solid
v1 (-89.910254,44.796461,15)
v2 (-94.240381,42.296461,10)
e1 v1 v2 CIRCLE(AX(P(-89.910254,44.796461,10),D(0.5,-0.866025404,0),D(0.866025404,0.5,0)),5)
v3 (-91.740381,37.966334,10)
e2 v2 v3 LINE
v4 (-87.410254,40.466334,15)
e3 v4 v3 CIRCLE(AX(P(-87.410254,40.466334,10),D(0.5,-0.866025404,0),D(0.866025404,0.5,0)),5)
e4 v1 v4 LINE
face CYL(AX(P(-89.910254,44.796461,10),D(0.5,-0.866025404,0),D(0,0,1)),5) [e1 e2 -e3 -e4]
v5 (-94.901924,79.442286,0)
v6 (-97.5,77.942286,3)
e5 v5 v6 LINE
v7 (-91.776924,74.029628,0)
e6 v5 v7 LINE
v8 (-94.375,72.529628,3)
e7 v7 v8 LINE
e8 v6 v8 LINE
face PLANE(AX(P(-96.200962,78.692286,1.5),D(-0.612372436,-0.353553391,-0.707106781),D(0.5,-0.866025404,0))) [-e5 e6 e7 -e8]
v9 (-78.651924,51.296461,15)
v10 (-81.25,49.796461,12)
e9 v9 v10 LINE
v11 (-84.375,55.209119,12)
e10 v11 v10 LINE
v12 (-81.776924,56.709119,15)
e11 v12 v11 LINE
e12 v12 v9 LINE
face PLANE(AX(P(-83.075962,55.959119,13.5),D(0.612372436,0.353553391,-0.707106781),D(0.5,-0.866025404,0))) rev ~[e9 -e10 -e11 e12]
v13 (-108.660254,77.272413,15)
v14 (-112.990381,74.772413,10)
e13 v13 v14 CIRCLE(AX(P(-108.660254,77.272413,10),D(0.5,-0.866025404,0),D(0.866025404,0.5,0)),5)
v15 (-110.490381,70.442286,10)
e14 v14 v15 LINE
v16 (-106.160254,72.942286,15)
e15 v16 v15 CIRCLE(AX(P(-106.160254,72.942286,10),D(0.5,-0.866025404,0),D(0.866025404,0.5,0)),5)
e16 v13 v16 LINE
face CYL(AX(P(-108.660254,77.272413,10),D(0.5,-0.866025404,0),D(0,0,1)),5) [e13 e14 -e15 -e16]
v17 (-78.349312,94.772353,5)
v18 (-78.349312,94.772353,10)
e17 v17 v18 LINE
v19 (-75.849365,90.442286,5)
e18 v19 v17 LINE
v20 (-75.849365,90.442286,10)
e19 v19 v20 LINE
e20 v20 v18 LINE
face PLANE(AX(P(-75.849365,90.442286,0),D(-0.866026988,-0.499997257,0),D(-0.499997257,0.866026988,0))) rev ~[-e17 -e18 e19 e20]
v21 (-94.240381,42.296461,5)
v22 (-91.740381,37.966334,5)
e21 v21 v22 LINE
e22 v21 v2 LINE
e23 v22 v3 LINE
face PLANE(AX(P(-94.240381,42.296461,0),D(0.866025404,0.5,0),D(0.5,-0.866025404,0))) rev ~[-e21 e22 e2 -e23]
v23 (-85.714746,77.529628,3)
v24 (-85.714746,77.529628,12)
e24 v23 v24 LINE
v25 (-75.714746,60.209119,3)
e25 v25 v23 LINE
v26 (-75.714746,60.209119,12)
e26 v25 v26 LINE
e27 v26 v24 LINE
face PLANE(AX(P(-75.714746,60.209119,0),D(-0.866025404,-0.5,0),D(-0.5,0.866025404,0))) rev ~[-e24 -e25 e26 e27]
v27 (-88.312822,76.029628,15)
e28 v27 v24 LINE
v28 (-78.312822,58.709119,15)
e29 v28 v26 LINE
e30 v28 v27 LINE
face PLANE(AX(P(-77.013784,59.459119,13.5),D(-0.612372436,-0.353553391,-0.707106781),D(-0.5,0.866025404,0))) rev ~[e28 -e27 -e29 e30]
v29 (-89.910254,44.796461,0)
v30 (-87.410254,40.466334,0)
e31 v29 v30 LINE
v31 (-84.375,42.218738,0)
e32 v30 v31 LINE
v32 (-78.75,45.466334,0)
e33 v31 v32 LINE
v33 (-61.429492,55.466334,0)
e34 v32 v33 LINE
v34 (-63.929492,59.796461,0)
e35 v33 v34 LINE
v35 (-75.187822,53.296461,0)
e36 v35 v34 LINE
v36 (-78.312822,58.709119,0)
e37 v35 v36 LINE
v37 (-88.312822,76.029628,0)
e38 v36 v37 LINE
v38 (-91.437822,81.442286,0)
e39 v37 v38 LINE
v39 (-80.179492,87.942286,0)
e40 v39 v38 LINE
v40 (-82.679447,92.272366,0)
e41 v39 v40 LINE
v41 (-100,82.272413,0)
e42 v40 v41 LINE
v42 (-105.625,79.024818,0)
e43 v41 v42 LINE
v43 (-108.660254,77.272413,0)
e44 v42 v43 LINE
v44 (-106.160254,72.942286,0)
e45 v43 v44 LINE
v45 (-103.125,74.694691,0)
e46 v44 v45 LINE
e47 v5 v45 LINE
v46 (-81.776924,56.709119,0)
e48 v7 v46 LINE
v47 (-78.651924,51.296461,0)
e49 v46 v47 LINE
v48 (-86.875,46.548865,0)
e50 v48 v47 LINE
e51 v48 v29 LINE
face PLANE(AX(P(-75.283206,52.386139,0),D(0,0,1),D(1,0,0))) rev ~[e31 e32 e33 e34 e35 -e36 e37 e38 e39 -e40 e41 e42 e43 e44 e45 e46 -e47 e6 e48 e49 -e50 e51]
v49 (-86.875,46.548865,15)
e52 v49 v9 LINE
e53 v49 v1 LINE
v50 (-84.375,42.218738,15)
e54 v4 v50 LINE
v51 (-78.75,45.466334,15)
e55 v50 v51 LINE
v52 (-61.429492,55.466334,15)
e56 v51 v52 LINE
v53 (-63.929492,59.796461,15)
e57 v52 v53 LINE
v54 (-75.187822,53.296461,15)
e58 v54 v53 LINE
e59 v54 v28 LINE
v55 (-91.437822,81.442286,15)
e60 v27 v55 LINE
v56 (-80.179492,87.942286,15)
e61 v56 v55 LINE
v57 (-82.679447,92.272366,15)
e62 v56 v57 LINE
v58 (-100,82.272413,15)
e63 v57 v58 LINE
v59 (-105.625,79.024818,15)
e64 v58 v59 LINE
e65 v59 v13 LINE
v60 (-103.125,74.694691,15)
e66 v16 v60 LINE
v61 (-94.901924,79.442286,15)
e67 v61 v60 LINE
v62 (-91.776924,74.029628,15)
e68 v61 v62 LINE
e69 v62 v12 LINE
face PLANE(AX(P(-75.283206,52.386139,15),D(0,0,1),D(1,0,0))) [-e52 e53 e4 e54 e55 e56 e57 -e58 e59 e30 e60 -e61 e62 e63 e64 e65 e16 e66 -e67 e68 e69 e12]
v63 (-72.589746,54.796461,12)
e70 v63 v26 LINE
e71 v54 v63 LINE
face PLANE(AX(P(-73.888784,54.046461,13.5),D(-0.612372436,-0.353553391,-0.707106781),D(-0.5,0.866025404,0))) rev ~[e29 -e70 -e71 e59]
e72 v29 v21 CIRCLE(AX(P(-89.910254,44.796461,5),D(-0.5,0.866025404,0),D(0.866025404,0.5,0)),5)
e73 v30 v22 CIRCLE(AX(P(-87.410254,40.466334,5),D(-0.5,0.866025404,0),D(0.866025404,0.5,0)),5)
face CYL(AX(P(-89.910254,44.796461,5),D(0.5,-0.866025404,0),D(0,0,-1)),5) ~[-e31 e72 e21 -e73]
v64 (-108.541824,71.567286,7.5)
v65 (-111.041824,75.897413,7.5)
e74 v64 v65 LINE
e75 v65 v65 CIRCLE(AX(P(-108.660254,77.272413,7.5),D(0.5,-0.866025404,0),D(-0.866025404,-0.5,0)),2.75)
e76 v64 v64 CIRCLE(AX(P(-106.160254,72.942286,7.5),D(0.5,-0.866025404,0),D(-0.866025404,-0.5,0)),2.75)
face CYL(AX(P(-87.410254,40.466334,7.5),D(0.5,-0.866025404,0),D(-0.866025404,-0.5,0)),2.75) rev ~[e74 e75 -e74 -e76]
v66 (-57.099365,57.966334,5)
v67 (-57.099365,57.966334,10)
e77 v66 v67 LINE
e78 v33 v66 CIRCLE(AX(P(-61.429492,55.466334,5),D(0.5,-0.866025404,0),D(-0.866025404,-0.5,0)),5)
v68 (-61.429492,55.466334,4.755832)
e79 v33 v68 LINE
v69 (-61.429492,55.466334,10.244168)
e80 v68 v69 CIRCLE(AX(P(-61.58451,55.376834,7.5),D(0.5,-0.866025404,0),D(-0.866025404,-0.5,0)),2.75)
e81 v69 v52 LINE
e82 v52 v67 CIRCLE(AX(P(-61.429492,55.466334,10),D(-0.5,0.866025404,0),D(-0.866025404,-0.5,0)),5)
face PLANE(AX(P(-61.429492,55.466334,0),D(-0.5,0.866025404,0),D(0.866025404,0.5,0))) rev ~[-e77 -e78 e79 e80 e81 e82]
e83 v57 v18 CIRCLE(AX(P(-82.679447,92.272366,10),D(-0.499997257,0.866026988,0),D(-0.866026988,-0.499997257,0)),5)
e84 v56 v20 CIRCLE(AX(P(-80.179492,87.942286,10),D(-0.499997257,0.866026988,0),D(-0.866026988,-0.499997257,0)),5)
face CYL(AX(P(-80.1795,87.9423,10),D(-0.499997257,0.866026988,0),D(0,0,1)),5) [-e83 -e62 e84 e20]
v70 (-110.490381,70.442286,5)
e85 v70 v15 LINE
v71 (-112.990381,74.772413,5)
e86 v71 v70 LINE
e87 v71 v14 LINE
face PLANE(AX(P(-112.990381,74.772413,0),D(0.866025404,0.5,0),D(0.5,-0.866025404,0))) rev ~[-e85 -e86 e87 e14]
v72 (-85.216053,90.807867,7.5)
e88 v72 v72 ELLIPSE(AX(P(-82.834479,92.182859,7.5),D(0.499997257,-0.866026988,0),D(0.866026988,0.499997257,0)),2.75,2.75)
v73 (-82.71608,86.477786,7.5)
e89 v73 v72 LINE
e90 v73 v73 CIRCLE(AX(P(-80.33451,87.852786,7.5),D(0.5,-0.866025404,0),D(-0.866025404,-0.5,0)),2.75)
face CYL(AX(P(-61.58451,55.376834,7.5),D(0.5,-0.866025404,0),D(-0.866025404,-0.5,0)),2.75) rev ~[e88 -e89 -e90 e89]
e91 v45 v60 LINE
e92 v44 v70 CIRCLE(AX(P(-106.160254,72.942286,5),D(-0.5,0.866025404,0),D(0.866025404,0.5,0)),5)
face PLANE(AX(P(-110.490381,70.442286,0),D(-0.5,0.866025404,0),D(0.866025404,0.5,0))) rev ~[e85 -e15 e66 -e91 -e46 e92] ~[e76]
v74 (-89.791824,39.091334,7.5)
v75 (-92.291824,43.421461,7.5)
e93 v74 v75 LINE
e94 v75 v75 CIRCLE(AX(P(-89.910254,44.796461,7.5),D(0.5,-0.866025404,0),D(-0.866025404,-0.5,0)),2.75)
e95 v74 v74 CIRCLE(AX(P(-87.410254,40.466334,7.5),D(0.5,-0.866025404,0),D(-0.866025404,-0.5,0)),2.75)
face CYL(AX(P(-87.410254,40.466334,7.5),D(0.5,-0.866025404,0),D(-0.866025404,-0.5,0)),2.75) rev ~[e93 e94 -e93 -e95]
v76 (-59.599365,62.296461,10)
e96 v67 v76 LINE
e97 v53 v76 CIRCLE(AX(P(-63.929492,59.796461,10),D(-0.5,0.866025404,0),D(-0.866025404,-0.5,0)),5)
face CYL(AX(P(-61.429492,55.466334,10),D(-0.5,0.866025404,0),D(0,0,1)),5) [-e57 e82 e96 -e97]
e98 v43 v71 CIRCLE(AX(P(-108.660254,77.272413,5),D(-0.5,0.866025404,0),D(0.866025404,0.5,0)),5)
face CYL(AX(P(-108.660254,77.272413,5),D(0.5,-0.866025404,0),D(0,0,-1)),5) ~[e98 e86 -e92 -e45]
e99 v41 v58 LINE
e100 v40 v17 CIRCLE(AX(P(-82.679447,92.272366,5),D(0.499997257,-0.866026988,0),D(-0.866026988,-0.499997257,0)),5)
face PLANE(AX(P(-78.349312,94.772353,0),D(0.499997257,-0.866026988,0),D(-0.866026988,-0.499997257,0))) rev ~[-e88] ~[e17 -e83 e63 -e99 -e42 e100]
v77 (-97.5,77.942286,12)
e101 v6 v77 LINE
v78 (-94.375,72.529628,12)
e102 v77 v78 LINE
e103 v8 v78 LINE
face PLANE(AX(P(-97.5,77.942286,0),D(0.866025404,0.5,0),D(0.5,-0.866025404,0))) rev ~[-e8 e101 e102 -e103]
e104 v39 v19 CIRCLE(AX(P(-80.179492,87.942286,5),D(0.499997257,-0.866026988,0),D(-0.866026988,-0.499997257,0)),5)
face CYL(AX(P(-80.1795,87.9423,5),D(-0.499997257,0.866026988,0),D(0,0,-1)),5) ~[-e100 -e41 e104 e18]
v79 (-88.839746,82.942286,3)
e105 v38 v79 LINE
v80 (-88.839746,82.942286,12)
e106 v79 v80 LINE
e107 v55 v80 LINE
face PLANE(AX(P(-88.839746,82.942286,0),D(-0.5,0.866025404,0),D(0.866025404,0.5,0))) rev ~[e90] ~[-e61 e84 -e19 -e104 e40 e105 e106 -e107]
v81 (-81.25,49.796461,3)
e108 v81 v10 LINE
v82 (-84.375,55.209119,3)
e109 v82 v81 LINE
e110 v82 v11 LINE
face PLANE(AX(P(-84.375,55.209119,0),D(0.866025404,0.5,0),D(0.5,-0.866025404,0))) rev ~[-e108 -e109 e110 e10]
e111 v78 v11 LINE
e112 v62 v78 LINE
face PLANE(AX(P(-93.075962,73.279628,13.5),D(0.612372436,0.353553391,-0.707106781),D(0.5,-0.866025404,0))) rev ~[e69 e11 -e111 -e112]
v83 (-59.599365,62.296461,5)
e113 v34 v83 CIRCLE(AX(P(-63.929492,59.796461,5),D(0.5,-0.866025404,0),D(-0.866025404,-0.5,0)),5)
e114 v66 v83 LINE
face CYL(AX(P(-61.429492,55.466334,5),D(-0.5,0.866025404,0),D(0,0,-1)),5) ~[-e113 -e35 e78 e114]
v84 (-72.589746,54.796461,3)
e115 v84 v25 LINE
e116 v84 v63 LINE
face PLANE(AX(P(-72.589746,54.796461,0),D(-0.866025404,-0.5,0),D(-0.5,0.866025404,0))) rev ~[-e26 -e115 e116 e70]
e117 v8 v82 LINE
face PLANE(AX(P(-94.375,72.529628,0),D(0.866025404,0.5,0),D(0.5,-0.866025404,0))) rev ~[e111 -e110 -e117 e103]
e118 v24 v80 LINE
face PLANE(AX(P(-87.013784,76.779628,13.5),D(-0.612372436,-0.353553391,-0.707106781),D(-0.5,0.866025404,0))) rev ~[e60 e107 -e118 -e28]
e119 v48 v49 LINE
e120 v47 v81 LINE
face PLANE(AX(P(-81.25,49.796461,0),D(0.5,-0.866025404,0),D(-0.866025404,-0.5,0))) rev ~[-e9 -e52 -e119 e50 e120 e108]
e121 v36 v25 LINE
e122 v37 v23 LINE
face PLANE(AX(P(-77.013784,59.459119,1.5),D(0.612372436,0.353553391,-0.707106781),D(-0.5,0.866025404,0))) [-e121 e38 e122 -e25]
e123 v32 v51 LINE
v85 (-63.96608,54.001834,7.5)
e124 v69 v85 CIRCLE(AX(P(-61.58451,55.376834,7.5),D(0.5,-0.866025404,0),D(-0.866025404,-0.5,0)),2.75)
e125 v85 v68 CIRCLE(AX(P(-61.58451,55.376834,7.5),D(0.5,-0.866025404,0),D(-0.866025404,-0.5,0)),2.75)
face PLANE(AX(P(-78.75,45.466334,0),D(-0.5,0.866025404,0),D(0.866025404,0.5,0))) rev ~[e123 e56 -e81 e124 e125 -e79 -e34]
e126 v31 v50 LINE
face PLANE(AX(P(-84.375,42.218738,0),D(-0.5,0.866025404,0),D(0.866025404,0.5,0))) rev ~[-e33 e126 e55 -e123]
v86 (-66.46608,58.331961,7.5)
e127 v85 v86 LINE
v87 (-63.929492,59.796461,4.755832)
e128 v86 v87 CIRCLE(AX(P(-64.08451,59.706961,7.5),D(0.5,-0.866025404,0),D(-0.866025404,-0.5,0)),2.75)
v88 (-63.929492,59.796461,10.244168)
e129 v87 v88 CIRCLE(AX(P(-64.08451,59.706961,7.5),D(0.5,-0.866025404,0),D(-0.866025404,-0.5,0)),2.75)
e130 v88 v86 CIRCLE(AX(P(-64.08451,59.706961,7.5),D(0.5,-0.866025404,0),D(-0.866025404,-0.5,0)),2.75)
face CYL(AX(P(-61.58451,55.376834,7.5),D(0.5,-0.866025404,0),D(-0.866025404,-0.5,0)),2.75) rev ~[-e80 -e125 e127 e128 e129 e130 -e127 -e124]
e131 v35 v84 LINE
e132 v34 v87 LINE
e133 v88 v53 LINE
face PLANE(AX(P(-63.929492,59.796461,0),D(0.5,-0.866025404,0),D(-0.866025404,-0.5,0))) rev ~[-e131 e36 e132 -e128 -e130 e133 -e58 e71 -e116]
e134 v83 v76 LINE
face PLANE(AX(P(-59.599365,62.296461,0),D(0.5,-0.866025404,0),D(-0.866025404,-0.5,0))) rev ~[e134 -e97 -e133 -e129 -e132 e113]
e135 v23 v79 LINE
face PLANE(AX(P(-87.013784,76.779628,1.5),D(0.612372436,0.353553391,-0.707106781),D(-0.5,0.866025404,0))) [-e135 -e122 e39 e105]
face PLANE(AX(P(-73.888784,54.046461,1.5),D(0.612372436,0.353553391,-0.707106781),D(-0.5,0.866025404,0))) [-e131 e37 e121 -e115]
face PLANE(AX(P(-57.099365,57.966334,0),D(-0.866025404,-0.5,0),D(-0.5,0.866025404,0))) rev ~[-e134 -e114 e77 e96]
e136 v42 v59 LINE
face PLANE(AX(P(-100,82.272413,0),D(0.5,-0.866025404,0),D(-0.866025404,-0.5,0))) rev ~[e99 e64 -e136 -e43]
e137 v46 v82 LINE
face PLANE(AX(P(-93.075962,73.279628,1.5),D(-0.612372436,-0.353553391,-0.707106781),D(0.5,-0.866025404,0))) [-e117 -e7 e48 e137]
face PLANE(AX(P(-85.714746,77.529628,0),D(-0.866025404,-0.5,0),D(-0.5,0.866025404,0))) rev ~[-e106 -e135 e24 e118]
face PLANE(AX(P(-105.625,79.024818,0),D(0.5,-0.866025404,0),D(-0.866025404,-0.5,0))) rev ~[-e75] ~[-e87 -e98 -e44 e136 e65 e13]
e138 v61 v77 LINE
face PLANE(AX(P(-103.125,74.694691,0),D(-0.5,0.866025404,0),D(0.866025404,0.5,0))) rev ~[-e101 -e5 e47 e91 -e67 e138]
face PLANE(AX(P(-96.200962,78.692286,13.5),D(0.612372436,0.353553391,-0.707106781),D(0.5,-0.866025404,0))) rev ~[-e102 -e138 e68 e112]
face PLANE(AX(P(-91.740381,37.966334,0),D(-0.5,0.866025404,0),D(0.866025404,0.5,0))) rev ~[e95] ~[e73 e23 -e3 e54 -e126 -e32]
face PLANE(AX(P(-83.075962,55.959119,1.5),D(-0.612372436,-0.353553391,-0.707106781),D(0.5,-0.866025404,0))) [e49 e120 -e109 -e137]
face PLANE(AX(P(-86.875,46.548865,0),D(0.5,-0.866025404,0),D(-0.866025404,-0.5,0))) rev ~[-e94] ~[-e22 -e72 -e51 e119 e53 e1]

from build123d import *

# Parameters (mm, degrees)
F1_DEPTH = 15
F3_DEPTH = 60
F4_SIZE  = 3
F5_R     = 5


with BuildPart() as f1:
    # F0 (on Top) → F1 (new body)
    with BuildSketch(Plane.XY):
        Polygon((-84.375, 42.2187384345), (-78.75, 45.4663336987), (-61.4294919243, 55.4663336987), (-63.9294919243, 59.7964607176), (-72.5897459622, 54.7964607176), (-75.7147459622, 60.2091194913), (-84.375, 55.2091194913), (-81.25, 49.7964607176), (-86.875, 46.5488654534), align=None)
        Polygon((-61.4294919243, 55.4663336987), (-57.0993649054, 57.9663336987), (-59.5993649054, 62.2964607176), (-63.9294919243, 59.7964607176), align=None)
        Polygon((-91.7403810568, 37.9663336987), (-84.375, 42.2187384345), (-86.875, 46.5488654534), (-94.2403810568, 42.2964607176), align=None)
        Polygon((-84.375, 55.2091194913), (-75.7147459622, 60.2091194913), (-85.7147459622, 77.5296275669), (-87.793790014, 76.329290924), (-94.375, 72.5296275669), align=None)
        Polygon((-87.793790014, 76.329290924), (-85.7147459622, 77.5296275669), (-88.8397459622, 82.9422863406), (-75.8493649054, 90.4422863406), (-78.3493115936, 94.7723526968), (-100, 82.2724133595), (-105.625, 79.0248180953), (-103.125, 74.6946910764), (-97.5, 77.9422863406), (-94.375, 72.5296275669), align=None)
        Polygon((-110.4903810568, 70.4422863406), (-103.125, 74.6946910764), (-105.625, 79.0248180953), (-112.9903810568, 74.7724133595), align=None)
    extrude(amount=F1_DEPTH)

    # F2 (on face) → F3 (cut)
    with BuildSketch(Plane(origin=(-39.375, 68.199500548, 0), x_dir=(0.8660254038, 0.5, 0), z_dir=(0.5, -0.8660254038, 0))):
        with BuildLine():
            ThreePointArc((-52.7163336987, 7.5), (-55.4663336987, 10.25), (-58.2163336987, 7.5))
            Line((-58.2163336987, 7.5), (-55.4663336987, 7.5))
            Line((-55.4663336987, 7.5), (-52.7163336987, 7.5))
        make_face()
        with BuildLine():
            Line((-55.4663336987, 7.5), (-58.2163336987, 7.5))
            ThreePointArc((-58.2163336987, 7.5), (-55.4663336987, 4.75), (-52.7163336987, 7.5))
            Line((-52.7163336987, 7.5), (-55.4663336987, 7.5))
        make_face()
        with BuildLine():
            ThreePointArc((-22.8953336987, 7.5), (-25.6453336987, 10.25), (-28.3953336987, 7.5))
            ThreePointArc((-28.3953336987, 7.5), (-25.6453336987, 4.75), (-22.8953336987, 7.5))
        make_face()
    extrude(amount=-F3_DEPTH, mode=Mode.SUBTRACT)

    # F4
    f4_edges = [f1.edges().sort_by_distance(p)[0] for p in [
        (-89.375, 63.869374, 15),
        (-80.714746, 68.869374, 15),
        (-89.375, 63.869374, 0),
        (-80.714746, 68.869374, 0),
    ]]
    chamfer(f4_edges, length=F4_SIZE)

    # F5
    f5_edges = [f1.edges().sort_by_distance(p)[0] for p in [
        (-92.990381, 40.131397, 0),
        (-111.740381, 72.60735, 0),
        (-111.740381, 72.60735, 15),
        (-92.990381, 40.131397, 15),
        (-58.349365, 60.131397, 15),
        (-58.349365, 60.131397, 0),
        (-77.099338, 92.60732, 15),
        (-77.099338, 92.60732, 0),
    ]]
    fillet(f5_edges, radius=F5_R)


solid = f1.part
